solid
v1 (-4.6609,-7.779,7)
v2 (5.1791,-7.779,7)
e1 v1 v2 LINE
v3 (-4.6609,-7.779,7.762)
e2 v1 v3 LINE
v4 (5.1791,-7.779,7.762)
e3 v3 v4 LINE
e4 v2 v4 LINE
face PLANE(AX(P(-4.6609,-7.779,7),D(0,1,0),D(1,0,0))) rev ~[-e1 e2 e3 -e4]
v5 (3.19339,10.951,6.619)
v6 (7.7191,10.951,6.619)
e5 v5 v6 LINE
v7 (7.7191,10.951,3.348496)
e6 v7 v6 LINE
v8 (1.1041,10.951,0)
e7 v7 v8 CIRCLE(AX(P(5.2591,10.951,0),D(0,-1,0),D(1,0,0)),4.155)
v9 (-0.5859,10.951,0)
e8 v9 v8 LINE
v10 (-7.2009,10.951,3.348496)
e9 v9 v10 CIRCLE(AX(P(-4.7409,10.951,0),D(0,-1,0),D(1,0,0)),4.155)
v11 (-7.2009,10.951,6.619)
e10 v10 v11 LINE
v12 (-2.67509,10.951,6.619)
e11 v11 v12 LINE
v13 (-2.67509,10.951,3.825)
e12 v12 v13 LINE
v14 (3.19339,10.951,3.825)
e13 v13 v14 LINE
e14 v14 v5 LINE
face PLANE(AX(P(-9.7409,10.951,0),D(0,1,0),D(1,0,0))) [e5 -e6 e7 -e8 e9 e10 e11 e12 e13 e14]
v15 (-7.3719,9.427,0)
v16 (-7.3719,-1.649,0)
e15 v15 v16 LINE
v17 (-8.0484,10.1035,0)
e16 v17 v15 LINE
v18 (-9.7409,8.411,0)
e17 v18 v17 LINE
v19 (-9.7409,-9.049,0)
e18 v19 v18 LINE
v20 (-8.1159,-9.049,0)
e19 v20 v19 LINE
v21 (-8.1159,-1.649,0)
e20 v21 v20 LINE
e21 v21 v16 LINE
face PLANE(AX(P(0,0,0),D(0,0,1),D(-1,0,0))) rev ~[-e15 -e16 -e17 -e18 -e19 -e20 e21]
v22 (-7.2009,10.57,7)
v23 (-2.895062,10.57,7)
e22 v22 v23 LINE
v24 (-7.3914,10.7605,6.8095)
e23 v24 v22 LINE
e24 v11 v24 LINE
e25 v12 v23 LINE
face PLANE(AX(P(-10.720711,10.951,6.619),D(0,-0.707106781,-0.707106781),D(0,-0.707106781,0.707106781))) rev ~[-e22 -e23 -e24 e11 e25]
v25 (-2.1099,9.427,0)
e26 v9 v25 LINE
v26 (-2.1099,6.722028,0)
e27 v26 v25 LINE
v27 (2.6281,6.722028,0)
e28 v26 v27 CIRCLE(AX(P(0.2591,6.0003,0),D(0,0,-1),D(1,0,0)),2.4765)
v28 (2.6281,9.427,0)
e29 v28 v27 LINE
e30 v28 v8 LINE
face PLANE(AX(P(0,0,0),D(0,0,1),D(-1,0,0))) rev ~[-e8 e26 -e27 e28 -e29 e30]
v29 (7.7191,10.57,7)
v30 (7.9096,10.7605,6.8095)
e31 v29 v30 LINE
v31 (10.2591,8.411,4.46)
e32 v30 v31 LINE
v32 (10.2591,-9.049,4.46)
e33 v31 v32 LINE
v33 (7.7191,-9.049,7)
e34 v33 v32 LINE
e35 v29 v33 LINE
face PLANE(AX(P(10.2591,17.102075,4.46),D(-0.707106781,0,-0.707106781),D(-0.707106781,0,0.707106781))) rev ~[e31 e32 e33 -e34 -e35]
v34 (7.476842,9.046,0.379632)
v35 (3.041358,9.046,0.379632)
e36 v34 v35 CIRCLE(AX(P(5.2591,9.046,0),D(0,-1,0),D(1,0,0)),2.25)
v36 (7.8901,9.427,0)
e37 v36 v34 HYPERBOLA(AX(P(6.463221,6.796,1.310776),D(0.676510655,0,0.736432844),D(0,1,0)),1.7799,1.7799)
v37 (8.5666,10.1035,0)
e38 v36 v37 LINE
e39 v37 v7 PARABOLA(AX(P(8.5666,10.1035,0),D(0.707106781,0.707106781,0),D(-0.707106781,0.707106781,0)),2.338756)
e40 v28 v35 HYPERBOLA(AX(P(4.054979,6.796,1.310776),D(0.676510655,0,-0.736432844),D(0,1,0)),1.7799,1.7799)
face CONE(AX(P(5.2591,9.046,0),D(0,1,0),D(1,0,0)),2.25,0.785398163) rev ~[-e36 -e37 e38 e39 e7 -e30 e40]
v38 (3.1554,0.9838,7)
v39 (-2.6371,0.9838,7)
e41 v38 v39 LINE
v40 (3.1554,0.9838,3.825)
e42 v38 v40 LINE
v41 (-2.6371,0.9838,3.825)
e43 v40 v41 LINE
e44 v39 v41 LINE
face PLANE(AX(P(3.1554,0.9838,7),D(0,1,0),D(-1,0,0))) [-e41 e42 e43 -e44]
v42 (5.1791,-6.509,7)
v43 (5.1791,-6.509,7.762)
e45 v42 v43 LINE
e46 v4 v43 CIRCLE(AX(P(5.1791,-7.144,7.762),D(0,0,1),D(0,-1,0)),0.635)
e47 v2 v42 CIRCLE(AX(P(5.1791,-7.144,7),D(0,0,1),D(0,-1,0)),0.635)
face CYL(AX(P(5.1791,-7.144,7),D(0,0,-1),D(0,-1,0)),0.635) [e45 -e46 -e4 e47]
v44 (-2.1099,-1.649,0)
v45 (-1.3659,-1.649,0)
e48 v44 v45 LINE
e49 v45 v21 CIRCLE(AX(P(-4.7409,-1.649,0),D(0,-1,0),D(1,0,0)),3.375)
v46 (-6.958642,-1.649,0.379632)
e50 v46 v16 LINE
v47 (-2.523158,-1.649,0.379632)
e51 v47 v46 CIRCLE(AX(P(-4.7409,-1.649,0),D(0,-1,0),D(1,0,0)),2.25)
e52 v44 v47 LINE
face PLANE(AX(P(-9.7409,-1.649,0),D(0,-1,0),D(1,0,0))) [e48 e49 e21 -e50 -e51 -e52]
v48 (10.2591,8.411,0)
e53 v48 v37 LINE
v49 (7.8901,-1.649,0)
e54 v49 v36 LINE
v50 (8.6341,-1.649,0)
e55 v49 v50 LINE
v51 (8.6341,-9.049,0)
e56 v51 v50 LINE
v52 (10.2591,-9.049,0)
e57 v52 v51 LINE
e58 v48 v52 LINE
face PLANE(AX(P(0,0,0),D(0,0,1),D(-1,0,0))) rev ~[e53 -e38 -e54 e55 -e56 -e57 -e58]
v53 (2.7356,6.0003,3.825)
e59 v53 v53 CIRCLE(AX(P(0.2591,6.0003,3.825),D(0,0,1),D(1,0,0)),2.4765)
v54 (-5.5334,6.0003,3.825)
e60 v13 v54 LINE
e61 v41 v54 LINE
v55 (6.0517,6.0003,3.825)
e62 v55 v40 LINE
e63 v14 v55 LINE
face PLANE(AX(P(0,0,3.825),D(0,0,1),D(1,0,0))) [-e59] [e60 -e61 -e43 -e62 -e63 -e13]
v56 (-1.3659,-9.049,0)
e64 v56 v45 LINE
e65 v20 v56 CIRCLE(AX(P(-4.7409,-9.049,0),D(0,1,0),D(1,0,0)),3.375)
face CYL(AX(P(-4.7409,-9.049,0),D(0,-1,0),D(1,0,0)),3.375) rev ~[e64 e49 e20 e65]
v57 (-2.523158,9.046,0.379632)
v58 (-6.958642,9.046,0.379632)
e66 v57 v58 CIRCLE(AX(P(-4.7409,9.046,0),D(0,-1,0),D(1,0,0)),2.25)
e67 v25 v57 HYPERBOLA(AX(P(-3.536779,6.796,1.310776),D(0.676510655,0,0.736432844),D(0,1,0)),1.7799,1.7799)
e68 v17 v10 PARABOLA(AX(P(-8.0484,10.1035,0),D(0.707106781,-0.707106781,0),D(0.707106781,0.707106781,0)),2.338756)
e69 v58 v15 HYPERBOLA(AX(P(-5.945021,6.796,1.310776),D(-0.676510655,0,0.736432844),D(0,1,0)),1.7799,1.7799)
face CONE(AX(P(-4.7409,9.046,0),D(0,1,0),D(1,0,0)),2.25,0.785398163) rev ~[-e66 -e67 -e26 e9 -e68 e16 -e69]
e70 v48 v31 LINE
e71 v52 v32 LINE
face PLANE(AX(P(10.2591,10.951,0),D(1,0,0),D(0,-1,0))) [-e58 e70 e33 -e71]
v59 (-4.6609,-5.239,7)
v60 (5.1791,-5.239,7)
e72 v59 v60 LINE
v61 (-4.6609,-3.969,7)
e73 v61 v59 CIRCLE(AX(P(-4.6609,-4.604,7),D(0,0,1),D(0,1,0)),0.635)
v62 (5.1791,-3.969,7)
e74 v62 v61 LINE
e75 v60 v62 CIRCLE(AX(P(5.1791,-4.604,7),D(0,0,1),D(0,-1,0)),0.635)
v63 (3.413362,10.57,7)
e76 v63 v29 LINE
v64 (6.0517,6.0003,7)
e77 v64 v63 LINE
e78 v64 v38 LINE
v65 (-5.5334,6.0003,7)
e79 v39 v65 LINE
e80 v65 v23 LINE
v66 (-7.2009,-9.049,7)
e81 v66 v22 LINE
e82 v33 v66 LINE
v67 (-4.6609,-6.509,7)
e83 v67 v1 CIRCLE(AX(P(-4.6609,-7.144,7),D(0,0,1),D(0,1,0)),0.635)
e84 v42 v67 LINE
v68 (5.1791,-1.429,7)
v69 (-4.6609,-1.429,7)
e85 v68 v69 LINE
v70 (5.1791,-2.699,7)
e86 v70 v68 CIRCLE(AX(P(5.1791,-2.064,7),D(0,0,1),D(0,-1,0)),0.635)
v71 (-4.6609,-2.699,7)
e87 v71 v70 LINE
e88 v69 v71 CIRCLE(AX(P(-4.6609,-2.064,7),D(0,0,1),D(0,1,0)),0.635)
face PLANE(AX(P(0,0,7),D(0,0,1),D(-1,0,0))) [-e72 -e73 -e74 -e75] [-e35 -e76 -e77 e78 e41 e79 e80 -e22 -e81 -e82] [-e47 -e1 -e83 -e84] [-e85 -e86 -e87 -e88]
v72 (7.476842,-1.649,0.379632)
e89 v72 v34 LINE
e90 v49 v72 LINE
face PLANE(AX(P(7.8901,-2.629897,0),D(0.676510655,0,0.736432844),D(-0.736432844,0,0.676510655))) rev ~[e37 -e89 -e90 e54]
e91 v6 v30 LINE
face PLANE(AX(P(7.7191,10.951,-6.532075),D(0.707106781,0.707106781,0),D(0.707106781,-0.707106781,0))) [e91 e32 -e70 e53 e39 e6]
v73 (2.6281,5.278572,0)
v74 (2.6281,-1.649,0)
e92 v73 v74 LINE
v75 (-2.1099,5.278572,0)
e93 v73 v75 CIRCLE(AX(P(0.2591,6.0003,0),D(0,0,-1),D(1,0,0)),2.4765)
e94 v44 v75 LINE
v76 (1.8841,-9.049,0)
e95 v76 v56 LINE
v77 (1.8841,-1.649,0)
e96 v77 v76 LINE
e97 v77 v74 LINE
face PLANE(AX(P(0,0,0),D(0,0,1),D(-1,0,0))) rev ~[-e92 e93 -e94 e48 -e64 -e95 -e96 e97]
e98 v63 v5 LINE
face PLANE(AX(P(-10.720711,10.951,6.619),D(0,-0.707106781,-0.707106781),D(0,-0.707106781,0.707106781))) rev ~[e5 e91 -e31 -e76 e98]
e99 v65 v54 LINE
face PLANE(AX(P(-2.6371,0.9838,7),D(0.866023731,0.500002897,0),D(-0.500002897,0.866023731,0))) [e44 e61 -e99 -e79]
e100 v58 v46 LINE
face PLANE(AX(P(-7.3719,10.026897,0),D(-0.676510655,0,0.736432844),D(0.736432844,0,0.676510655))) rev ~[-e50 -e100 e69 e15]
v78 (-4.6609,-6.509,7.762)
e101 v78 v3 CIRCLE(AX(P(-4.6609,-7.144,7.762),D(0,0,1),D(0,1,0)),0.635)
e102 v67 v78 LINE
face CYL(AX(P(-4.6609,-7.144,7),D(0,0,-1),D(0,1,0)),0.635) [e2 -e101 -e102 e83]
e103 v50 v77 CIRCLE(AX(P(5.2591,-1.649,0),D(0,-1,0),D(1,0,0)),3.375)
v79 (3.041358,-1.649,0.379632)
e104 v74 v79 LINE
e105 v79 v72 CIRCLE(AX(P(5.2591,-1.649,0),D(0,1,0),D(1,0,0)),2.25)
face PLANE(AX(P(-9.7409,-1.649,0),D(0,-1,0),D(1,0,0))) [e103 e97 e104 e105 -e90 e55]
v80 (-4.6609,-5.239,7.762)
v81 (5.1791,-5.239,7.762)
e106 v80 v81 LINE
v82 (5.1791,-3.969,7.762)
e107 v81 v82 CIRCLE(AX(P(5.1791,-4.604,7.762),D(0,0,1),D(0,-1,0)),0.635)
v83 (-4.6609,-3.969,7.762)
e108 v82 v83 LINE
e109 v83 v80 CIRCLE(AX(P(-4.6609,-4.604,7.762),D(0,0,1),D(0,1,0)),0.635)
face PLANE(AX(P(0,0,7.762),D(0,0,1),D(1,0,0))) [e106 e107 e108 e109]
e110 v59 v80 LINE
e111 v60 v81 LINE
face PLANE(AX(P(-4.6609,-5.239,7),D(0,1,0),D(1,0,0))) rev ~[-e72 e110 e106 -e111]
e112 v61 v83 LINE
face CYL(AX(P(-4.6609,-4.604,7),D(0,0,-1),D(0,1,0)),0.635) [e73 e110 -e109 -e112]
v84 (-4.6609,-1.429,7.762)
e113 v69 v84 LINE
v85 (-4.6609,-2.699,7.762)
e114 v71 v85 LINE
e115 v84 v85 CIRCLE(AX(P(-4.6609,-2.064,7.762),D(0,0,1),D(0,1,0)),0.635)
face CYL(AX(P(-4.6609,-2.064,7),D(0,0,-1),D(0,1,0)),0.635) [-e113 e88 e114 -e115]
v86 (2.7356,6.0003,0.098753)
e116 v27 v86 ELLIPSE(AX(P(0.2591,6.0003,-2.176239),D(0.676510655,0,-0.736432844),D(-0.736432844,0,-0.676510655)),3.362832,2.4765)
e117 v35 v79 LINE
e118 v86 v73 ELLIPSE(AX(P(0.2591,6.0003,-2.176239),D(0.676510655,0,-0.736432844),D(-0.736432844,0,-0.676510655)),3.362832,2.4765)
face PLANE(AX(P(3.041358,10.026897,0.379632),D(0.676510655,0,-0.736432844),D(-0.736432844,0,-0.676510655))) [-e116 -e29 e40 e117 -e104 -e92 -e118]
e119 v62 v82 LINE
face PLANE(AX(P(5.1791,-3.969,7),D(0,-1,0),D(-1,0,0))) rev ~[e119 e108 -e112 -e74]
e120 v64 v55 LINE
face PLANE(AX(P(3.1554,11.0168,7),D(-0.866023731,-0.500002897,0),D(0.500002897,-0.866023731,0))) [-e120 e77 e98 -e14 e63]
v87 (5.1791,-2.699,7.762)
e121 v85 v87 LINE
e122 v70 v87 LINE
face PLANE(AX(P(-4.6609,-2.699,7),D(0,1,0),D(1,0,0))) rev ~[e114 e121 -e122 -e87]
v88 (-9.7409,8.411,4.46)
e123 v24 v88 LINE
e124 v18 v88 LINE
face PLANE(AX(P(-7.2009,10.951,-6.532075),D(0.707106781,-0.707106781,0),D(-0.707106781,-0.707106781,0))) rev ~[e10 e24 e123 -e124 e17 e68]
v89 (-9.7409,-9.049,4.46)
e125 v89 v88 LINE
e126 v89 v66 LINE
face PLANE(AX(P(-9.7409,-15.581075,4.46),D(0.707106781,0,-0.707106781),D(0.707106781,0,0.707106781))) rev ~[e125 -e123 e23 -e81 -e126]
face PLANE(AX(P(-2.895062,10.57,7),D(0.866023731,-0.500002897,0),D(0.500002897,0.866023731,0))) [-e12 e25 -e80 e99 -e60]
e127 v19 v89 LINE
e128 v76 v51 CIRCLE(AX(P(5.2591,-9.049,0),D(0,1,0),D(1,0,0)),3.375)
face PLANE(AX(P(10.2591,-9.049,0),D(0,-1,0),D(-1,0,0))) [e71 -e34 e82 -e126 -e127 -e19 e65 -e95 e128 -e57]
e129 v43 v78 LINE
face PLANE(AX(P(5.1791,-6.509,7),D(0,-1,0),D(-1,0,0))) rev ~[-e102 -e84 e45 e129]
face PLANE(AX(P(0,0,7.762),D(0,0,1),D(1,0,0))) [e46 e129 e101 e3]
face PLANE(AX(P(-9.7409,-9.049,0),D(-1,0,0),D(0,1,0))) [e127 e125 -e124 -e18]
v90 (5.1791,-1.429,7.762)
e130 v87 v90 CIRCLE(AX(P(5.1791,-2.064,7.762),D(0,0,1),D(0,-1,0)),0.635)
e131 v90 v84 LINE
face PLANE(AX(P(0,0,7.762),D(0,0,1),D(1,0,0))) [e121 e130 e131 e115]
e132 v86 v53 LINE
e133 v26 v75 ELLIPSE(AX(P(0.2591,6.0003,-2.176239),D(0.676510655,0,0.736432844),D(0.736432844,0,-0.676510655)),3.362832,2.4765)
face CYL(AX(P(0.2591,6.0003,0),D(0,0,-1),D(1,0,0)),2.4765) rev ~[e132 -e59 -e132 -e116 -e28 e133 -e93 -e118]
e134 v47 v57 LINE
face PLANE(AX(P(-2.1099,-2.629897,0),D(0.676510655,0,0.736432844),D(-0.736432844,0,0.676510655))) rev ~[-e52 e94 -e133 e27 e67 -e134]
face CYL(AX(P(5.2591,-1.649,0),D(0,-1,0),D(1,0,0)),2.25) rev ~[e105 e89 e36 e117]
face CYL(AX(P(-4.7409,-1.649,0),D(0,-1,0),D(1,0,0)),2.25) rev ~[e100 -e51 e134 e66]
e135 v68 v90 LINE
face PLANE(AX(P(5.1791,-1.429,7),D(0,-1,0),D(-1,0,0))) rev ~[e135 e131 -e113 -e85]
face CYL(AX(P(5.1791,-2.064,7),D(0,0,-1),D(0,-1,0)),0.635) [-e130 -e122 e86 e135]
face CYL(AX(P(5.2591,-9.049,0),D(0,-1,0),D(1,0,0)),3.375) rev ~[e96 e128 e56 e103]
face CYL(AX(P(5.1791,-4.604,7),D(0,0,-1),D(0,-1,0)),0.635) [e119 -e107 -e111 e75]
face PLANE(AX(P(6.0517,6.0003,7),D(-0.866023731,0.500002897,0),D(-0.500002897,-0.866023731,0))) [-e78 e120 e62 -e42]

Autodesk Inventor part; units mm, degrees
ref_plane "YZ Plane" through (0, 0, 0) normal (1, 0, 0) x (0, 1, 0)
ref_plane "XZ Plane" through (0, 0, 0) normal (0, 1, 0) x (-1, 0, 0)
ref_plane "XY Plane" through (0, 0, 0) normal (0, 0, 1) x (1, 0, 0)
sketch "Sketch1" plane through (0, 0, 0) normal (0, 1, 0) x (-1, 0, 0)
  line L0 (-10.2591, 9.049) -> (9.7409, 9.049)
  line L1 (9.7409, 9.049) -> (9.7409, -10.951)
  line L2 (9.7409, -10.951) -> (-10.2591, -10.951)
  line L3 (-10.2591, -10.951) -> (-10.2591, 9.049)
  point P0 (0, 0)
  dimension "d0" = 20
  dimension "d1" = 20
extrude "Extrusion1" add sketch "Sketch1" along normal blind 7
sketch "Sketch2" plane through (-9.7409, 0, 9.049) normal (0, 0, 1) x (1, 0, 0)
  line L0 (20, 0) -> (0, 0) projected
  line L1 (20, 0) -> (20, 7) projected
  line L2 (0, 0) -> (0, 7) projected
  circle A0 centre (15, 0) radius 3.375
  circle A1 centre (5, 0) radius 3.375
  point P0 (9.7409, 0)
  dimension "d4" = 6.75
  dimension "d5" = 6.75
  dimension "d6" = 5
  dimension "d7" = 5
  dimension "d32" = 10
extrude "Extrusion2" cut sketch "Sketch2" against normal blind 7.4
sketch "Sketch3" plane through (-9.7409, 0, 1.649) normal (0, 0, 1) x (1, 0, 0)
  arc A0 (8.375, 0) -> (1.625, 0) centre (5, 0) ccw projected
  line L0 (18.375, 0) -> (11.625, 0) projected
  arc A1 (18.375, 0) -> (11.625, 0) centre (15, 0) ccw projected
  circle A2 centre (15, 0) radius 2.25
  circle A3 centre (5, 0) radius 2.25
  point P0 (9.7409, 0)
  dimension "d10" = 4.5
  dimension "d11" = 4.5
extrude "Extrusion3" cut sketch "Sketch3" against normal through all contours A2 L0 | L0 A2 | A3
sketch "Sketch4" plane through (0, 0, 0) normal (0, -1, 0) x (1, 0, 0)
  line L0 (-2.4909, 1.649) -> (-2.4909, -10.951) projected
  line L1 (3.0091, -10.951) -> (3.0091, 1.649) projected
  circle A0 centre (0.2591, -6.0003) radius 2.4765
  point P0 (0, 0)
  dimension "d14" = 4.953
  dimension "d15" = 5.5
  dimension "d16" = 2.75
extrude "Extrusion4" cut sketch "Sketch4" against normal through all
chamfer "Chamfer1" distance 1.905 angle 45 2 edges at (5.2591, 2.25, -10.951) (-4.7409, 2.25, -10.951)
chamfer "Chamfer2" distance 0.381 angle 45 5 edges at (-2.4909, 0, -3.6985) (-6.9909, 0, -3.6985) (7.5091, 0, -3.6985) (3.0091, 0, -3.6985) (0.2591, 7, -10.951)
chamfer "Chamfer3" distance 2.54 angle 45 4 edges at (-9.7409, 7, -0.7605) (10.2591, 7, -0.7605) (-9.7409, 3.3095, -10.951) (10.2591, 3.3095, -10.951)
sketch "Sketch5" plane through (0, 7, 0) normal (0, 1, 0) x (1, 0, 0)
  line L0 (-7.2009, 10.57) -> (7.7191, 10.57) projected
  circle A0 centre (0.2591, 6.0003) radius 2.4765 projected
  line L1 (3.1554, 0.9838) -> (-2.6371, 0.9838)
  line L2 (-2.6371, 0.9838) -> (-5.5334, 6.0003)
  line L3 (-5.5334, 6.0003) -> (-2.6371, 11.0168)
  line L4 (-2.6371, 11.0168) -> (3.1554, 11.0168)
  line L5 (3.1554, 11.0168) -> (6.0517, 6.0003)
  line L6 (6.0517, 6.0003) -> (3.1554, 0.9838)
  point P0 (0, 0)
  dimension "d29" = 10.033
extrude "Extrusion5" cut sketch "Sketch5" against normal blind 3.175
sketch "Sketch6" plane through (0, 7, 0) normal (0, 1, 0) x (1, 0, 0)
  line L0 (-7.2009, -9.049) -> (-7.2009, 10.57) projected
  line L1 (-7.2009, -9.049) -> (7.7191, -9.049) projected
  line L2 (7.7191, 10.57) -> (7.7191, -9.049) projected
  line L3 (3.4133, 10.57) -> (7.7191, 10.57) projected
  line L4 (-4.6609, -7.144) -> (5.1791, -7.144) construction
  line L5 (-4.6609, -7.779) -> (5.1791, -7.779)
  line L6 (5.1791, -6.509) -> (-4.6609, -6.509)
  arc A0 (-4.6609, -6.509) -> (-4.6609, -7.779) centre (-4.6609, -7.144) ccw
  arc A1 (5.1791, -7.779) -> (5.1791, -6.509) centre (5.1791, -7.144) ccw
  line L7 (-4.6609, -5.239) -> (5.1791, -5.239)
  line L8 (5.1791, -3.969) -> (-4.6609, -3.969)
  arc A2 (-4.6609, -3.969) -> (-4.6609, -5.239) centre (-4.6609, -4.604) ccw
  arc A3 (5.1791, -5.239) -> (5.1791, -3.969) centre (5.1791, -4.604) ccw
  line L9 (-4.6609, -2.699) -> (5.1791, -2.699)
  line L10 (5.1791, -1.429) -> (-4.6609, -1.429)
  arc A4 (-4.6609, -1.429) -> (-4.6609, -2.699) centre (-4.6609, -2.064) ccw
  arc A5 (5.1791, -2.699) -> (5.1791, -1.429) centre (5.1791, -2.064) ccw
  point P0 (0, 0)
  point P1 (0.2591, -7.144)
  dimension "d33" = 1.27
  dimension "d34" = 2.54
  dimension "d35" = 2.54
  dimension "d36" = 1.905
  dimension "d39" = 2.54
extrude "Extrusion6" add sketch "Sketch6" along normal blind 0.762
move or copy body "Move Body1" bodies to move or copy 1 copy no rotation origin (0, 0, 0) rotation axis (1, 0, 0) rotation angle 90
equation "\"d16\" = 0.5 * d15"
properties part number "key_half"
